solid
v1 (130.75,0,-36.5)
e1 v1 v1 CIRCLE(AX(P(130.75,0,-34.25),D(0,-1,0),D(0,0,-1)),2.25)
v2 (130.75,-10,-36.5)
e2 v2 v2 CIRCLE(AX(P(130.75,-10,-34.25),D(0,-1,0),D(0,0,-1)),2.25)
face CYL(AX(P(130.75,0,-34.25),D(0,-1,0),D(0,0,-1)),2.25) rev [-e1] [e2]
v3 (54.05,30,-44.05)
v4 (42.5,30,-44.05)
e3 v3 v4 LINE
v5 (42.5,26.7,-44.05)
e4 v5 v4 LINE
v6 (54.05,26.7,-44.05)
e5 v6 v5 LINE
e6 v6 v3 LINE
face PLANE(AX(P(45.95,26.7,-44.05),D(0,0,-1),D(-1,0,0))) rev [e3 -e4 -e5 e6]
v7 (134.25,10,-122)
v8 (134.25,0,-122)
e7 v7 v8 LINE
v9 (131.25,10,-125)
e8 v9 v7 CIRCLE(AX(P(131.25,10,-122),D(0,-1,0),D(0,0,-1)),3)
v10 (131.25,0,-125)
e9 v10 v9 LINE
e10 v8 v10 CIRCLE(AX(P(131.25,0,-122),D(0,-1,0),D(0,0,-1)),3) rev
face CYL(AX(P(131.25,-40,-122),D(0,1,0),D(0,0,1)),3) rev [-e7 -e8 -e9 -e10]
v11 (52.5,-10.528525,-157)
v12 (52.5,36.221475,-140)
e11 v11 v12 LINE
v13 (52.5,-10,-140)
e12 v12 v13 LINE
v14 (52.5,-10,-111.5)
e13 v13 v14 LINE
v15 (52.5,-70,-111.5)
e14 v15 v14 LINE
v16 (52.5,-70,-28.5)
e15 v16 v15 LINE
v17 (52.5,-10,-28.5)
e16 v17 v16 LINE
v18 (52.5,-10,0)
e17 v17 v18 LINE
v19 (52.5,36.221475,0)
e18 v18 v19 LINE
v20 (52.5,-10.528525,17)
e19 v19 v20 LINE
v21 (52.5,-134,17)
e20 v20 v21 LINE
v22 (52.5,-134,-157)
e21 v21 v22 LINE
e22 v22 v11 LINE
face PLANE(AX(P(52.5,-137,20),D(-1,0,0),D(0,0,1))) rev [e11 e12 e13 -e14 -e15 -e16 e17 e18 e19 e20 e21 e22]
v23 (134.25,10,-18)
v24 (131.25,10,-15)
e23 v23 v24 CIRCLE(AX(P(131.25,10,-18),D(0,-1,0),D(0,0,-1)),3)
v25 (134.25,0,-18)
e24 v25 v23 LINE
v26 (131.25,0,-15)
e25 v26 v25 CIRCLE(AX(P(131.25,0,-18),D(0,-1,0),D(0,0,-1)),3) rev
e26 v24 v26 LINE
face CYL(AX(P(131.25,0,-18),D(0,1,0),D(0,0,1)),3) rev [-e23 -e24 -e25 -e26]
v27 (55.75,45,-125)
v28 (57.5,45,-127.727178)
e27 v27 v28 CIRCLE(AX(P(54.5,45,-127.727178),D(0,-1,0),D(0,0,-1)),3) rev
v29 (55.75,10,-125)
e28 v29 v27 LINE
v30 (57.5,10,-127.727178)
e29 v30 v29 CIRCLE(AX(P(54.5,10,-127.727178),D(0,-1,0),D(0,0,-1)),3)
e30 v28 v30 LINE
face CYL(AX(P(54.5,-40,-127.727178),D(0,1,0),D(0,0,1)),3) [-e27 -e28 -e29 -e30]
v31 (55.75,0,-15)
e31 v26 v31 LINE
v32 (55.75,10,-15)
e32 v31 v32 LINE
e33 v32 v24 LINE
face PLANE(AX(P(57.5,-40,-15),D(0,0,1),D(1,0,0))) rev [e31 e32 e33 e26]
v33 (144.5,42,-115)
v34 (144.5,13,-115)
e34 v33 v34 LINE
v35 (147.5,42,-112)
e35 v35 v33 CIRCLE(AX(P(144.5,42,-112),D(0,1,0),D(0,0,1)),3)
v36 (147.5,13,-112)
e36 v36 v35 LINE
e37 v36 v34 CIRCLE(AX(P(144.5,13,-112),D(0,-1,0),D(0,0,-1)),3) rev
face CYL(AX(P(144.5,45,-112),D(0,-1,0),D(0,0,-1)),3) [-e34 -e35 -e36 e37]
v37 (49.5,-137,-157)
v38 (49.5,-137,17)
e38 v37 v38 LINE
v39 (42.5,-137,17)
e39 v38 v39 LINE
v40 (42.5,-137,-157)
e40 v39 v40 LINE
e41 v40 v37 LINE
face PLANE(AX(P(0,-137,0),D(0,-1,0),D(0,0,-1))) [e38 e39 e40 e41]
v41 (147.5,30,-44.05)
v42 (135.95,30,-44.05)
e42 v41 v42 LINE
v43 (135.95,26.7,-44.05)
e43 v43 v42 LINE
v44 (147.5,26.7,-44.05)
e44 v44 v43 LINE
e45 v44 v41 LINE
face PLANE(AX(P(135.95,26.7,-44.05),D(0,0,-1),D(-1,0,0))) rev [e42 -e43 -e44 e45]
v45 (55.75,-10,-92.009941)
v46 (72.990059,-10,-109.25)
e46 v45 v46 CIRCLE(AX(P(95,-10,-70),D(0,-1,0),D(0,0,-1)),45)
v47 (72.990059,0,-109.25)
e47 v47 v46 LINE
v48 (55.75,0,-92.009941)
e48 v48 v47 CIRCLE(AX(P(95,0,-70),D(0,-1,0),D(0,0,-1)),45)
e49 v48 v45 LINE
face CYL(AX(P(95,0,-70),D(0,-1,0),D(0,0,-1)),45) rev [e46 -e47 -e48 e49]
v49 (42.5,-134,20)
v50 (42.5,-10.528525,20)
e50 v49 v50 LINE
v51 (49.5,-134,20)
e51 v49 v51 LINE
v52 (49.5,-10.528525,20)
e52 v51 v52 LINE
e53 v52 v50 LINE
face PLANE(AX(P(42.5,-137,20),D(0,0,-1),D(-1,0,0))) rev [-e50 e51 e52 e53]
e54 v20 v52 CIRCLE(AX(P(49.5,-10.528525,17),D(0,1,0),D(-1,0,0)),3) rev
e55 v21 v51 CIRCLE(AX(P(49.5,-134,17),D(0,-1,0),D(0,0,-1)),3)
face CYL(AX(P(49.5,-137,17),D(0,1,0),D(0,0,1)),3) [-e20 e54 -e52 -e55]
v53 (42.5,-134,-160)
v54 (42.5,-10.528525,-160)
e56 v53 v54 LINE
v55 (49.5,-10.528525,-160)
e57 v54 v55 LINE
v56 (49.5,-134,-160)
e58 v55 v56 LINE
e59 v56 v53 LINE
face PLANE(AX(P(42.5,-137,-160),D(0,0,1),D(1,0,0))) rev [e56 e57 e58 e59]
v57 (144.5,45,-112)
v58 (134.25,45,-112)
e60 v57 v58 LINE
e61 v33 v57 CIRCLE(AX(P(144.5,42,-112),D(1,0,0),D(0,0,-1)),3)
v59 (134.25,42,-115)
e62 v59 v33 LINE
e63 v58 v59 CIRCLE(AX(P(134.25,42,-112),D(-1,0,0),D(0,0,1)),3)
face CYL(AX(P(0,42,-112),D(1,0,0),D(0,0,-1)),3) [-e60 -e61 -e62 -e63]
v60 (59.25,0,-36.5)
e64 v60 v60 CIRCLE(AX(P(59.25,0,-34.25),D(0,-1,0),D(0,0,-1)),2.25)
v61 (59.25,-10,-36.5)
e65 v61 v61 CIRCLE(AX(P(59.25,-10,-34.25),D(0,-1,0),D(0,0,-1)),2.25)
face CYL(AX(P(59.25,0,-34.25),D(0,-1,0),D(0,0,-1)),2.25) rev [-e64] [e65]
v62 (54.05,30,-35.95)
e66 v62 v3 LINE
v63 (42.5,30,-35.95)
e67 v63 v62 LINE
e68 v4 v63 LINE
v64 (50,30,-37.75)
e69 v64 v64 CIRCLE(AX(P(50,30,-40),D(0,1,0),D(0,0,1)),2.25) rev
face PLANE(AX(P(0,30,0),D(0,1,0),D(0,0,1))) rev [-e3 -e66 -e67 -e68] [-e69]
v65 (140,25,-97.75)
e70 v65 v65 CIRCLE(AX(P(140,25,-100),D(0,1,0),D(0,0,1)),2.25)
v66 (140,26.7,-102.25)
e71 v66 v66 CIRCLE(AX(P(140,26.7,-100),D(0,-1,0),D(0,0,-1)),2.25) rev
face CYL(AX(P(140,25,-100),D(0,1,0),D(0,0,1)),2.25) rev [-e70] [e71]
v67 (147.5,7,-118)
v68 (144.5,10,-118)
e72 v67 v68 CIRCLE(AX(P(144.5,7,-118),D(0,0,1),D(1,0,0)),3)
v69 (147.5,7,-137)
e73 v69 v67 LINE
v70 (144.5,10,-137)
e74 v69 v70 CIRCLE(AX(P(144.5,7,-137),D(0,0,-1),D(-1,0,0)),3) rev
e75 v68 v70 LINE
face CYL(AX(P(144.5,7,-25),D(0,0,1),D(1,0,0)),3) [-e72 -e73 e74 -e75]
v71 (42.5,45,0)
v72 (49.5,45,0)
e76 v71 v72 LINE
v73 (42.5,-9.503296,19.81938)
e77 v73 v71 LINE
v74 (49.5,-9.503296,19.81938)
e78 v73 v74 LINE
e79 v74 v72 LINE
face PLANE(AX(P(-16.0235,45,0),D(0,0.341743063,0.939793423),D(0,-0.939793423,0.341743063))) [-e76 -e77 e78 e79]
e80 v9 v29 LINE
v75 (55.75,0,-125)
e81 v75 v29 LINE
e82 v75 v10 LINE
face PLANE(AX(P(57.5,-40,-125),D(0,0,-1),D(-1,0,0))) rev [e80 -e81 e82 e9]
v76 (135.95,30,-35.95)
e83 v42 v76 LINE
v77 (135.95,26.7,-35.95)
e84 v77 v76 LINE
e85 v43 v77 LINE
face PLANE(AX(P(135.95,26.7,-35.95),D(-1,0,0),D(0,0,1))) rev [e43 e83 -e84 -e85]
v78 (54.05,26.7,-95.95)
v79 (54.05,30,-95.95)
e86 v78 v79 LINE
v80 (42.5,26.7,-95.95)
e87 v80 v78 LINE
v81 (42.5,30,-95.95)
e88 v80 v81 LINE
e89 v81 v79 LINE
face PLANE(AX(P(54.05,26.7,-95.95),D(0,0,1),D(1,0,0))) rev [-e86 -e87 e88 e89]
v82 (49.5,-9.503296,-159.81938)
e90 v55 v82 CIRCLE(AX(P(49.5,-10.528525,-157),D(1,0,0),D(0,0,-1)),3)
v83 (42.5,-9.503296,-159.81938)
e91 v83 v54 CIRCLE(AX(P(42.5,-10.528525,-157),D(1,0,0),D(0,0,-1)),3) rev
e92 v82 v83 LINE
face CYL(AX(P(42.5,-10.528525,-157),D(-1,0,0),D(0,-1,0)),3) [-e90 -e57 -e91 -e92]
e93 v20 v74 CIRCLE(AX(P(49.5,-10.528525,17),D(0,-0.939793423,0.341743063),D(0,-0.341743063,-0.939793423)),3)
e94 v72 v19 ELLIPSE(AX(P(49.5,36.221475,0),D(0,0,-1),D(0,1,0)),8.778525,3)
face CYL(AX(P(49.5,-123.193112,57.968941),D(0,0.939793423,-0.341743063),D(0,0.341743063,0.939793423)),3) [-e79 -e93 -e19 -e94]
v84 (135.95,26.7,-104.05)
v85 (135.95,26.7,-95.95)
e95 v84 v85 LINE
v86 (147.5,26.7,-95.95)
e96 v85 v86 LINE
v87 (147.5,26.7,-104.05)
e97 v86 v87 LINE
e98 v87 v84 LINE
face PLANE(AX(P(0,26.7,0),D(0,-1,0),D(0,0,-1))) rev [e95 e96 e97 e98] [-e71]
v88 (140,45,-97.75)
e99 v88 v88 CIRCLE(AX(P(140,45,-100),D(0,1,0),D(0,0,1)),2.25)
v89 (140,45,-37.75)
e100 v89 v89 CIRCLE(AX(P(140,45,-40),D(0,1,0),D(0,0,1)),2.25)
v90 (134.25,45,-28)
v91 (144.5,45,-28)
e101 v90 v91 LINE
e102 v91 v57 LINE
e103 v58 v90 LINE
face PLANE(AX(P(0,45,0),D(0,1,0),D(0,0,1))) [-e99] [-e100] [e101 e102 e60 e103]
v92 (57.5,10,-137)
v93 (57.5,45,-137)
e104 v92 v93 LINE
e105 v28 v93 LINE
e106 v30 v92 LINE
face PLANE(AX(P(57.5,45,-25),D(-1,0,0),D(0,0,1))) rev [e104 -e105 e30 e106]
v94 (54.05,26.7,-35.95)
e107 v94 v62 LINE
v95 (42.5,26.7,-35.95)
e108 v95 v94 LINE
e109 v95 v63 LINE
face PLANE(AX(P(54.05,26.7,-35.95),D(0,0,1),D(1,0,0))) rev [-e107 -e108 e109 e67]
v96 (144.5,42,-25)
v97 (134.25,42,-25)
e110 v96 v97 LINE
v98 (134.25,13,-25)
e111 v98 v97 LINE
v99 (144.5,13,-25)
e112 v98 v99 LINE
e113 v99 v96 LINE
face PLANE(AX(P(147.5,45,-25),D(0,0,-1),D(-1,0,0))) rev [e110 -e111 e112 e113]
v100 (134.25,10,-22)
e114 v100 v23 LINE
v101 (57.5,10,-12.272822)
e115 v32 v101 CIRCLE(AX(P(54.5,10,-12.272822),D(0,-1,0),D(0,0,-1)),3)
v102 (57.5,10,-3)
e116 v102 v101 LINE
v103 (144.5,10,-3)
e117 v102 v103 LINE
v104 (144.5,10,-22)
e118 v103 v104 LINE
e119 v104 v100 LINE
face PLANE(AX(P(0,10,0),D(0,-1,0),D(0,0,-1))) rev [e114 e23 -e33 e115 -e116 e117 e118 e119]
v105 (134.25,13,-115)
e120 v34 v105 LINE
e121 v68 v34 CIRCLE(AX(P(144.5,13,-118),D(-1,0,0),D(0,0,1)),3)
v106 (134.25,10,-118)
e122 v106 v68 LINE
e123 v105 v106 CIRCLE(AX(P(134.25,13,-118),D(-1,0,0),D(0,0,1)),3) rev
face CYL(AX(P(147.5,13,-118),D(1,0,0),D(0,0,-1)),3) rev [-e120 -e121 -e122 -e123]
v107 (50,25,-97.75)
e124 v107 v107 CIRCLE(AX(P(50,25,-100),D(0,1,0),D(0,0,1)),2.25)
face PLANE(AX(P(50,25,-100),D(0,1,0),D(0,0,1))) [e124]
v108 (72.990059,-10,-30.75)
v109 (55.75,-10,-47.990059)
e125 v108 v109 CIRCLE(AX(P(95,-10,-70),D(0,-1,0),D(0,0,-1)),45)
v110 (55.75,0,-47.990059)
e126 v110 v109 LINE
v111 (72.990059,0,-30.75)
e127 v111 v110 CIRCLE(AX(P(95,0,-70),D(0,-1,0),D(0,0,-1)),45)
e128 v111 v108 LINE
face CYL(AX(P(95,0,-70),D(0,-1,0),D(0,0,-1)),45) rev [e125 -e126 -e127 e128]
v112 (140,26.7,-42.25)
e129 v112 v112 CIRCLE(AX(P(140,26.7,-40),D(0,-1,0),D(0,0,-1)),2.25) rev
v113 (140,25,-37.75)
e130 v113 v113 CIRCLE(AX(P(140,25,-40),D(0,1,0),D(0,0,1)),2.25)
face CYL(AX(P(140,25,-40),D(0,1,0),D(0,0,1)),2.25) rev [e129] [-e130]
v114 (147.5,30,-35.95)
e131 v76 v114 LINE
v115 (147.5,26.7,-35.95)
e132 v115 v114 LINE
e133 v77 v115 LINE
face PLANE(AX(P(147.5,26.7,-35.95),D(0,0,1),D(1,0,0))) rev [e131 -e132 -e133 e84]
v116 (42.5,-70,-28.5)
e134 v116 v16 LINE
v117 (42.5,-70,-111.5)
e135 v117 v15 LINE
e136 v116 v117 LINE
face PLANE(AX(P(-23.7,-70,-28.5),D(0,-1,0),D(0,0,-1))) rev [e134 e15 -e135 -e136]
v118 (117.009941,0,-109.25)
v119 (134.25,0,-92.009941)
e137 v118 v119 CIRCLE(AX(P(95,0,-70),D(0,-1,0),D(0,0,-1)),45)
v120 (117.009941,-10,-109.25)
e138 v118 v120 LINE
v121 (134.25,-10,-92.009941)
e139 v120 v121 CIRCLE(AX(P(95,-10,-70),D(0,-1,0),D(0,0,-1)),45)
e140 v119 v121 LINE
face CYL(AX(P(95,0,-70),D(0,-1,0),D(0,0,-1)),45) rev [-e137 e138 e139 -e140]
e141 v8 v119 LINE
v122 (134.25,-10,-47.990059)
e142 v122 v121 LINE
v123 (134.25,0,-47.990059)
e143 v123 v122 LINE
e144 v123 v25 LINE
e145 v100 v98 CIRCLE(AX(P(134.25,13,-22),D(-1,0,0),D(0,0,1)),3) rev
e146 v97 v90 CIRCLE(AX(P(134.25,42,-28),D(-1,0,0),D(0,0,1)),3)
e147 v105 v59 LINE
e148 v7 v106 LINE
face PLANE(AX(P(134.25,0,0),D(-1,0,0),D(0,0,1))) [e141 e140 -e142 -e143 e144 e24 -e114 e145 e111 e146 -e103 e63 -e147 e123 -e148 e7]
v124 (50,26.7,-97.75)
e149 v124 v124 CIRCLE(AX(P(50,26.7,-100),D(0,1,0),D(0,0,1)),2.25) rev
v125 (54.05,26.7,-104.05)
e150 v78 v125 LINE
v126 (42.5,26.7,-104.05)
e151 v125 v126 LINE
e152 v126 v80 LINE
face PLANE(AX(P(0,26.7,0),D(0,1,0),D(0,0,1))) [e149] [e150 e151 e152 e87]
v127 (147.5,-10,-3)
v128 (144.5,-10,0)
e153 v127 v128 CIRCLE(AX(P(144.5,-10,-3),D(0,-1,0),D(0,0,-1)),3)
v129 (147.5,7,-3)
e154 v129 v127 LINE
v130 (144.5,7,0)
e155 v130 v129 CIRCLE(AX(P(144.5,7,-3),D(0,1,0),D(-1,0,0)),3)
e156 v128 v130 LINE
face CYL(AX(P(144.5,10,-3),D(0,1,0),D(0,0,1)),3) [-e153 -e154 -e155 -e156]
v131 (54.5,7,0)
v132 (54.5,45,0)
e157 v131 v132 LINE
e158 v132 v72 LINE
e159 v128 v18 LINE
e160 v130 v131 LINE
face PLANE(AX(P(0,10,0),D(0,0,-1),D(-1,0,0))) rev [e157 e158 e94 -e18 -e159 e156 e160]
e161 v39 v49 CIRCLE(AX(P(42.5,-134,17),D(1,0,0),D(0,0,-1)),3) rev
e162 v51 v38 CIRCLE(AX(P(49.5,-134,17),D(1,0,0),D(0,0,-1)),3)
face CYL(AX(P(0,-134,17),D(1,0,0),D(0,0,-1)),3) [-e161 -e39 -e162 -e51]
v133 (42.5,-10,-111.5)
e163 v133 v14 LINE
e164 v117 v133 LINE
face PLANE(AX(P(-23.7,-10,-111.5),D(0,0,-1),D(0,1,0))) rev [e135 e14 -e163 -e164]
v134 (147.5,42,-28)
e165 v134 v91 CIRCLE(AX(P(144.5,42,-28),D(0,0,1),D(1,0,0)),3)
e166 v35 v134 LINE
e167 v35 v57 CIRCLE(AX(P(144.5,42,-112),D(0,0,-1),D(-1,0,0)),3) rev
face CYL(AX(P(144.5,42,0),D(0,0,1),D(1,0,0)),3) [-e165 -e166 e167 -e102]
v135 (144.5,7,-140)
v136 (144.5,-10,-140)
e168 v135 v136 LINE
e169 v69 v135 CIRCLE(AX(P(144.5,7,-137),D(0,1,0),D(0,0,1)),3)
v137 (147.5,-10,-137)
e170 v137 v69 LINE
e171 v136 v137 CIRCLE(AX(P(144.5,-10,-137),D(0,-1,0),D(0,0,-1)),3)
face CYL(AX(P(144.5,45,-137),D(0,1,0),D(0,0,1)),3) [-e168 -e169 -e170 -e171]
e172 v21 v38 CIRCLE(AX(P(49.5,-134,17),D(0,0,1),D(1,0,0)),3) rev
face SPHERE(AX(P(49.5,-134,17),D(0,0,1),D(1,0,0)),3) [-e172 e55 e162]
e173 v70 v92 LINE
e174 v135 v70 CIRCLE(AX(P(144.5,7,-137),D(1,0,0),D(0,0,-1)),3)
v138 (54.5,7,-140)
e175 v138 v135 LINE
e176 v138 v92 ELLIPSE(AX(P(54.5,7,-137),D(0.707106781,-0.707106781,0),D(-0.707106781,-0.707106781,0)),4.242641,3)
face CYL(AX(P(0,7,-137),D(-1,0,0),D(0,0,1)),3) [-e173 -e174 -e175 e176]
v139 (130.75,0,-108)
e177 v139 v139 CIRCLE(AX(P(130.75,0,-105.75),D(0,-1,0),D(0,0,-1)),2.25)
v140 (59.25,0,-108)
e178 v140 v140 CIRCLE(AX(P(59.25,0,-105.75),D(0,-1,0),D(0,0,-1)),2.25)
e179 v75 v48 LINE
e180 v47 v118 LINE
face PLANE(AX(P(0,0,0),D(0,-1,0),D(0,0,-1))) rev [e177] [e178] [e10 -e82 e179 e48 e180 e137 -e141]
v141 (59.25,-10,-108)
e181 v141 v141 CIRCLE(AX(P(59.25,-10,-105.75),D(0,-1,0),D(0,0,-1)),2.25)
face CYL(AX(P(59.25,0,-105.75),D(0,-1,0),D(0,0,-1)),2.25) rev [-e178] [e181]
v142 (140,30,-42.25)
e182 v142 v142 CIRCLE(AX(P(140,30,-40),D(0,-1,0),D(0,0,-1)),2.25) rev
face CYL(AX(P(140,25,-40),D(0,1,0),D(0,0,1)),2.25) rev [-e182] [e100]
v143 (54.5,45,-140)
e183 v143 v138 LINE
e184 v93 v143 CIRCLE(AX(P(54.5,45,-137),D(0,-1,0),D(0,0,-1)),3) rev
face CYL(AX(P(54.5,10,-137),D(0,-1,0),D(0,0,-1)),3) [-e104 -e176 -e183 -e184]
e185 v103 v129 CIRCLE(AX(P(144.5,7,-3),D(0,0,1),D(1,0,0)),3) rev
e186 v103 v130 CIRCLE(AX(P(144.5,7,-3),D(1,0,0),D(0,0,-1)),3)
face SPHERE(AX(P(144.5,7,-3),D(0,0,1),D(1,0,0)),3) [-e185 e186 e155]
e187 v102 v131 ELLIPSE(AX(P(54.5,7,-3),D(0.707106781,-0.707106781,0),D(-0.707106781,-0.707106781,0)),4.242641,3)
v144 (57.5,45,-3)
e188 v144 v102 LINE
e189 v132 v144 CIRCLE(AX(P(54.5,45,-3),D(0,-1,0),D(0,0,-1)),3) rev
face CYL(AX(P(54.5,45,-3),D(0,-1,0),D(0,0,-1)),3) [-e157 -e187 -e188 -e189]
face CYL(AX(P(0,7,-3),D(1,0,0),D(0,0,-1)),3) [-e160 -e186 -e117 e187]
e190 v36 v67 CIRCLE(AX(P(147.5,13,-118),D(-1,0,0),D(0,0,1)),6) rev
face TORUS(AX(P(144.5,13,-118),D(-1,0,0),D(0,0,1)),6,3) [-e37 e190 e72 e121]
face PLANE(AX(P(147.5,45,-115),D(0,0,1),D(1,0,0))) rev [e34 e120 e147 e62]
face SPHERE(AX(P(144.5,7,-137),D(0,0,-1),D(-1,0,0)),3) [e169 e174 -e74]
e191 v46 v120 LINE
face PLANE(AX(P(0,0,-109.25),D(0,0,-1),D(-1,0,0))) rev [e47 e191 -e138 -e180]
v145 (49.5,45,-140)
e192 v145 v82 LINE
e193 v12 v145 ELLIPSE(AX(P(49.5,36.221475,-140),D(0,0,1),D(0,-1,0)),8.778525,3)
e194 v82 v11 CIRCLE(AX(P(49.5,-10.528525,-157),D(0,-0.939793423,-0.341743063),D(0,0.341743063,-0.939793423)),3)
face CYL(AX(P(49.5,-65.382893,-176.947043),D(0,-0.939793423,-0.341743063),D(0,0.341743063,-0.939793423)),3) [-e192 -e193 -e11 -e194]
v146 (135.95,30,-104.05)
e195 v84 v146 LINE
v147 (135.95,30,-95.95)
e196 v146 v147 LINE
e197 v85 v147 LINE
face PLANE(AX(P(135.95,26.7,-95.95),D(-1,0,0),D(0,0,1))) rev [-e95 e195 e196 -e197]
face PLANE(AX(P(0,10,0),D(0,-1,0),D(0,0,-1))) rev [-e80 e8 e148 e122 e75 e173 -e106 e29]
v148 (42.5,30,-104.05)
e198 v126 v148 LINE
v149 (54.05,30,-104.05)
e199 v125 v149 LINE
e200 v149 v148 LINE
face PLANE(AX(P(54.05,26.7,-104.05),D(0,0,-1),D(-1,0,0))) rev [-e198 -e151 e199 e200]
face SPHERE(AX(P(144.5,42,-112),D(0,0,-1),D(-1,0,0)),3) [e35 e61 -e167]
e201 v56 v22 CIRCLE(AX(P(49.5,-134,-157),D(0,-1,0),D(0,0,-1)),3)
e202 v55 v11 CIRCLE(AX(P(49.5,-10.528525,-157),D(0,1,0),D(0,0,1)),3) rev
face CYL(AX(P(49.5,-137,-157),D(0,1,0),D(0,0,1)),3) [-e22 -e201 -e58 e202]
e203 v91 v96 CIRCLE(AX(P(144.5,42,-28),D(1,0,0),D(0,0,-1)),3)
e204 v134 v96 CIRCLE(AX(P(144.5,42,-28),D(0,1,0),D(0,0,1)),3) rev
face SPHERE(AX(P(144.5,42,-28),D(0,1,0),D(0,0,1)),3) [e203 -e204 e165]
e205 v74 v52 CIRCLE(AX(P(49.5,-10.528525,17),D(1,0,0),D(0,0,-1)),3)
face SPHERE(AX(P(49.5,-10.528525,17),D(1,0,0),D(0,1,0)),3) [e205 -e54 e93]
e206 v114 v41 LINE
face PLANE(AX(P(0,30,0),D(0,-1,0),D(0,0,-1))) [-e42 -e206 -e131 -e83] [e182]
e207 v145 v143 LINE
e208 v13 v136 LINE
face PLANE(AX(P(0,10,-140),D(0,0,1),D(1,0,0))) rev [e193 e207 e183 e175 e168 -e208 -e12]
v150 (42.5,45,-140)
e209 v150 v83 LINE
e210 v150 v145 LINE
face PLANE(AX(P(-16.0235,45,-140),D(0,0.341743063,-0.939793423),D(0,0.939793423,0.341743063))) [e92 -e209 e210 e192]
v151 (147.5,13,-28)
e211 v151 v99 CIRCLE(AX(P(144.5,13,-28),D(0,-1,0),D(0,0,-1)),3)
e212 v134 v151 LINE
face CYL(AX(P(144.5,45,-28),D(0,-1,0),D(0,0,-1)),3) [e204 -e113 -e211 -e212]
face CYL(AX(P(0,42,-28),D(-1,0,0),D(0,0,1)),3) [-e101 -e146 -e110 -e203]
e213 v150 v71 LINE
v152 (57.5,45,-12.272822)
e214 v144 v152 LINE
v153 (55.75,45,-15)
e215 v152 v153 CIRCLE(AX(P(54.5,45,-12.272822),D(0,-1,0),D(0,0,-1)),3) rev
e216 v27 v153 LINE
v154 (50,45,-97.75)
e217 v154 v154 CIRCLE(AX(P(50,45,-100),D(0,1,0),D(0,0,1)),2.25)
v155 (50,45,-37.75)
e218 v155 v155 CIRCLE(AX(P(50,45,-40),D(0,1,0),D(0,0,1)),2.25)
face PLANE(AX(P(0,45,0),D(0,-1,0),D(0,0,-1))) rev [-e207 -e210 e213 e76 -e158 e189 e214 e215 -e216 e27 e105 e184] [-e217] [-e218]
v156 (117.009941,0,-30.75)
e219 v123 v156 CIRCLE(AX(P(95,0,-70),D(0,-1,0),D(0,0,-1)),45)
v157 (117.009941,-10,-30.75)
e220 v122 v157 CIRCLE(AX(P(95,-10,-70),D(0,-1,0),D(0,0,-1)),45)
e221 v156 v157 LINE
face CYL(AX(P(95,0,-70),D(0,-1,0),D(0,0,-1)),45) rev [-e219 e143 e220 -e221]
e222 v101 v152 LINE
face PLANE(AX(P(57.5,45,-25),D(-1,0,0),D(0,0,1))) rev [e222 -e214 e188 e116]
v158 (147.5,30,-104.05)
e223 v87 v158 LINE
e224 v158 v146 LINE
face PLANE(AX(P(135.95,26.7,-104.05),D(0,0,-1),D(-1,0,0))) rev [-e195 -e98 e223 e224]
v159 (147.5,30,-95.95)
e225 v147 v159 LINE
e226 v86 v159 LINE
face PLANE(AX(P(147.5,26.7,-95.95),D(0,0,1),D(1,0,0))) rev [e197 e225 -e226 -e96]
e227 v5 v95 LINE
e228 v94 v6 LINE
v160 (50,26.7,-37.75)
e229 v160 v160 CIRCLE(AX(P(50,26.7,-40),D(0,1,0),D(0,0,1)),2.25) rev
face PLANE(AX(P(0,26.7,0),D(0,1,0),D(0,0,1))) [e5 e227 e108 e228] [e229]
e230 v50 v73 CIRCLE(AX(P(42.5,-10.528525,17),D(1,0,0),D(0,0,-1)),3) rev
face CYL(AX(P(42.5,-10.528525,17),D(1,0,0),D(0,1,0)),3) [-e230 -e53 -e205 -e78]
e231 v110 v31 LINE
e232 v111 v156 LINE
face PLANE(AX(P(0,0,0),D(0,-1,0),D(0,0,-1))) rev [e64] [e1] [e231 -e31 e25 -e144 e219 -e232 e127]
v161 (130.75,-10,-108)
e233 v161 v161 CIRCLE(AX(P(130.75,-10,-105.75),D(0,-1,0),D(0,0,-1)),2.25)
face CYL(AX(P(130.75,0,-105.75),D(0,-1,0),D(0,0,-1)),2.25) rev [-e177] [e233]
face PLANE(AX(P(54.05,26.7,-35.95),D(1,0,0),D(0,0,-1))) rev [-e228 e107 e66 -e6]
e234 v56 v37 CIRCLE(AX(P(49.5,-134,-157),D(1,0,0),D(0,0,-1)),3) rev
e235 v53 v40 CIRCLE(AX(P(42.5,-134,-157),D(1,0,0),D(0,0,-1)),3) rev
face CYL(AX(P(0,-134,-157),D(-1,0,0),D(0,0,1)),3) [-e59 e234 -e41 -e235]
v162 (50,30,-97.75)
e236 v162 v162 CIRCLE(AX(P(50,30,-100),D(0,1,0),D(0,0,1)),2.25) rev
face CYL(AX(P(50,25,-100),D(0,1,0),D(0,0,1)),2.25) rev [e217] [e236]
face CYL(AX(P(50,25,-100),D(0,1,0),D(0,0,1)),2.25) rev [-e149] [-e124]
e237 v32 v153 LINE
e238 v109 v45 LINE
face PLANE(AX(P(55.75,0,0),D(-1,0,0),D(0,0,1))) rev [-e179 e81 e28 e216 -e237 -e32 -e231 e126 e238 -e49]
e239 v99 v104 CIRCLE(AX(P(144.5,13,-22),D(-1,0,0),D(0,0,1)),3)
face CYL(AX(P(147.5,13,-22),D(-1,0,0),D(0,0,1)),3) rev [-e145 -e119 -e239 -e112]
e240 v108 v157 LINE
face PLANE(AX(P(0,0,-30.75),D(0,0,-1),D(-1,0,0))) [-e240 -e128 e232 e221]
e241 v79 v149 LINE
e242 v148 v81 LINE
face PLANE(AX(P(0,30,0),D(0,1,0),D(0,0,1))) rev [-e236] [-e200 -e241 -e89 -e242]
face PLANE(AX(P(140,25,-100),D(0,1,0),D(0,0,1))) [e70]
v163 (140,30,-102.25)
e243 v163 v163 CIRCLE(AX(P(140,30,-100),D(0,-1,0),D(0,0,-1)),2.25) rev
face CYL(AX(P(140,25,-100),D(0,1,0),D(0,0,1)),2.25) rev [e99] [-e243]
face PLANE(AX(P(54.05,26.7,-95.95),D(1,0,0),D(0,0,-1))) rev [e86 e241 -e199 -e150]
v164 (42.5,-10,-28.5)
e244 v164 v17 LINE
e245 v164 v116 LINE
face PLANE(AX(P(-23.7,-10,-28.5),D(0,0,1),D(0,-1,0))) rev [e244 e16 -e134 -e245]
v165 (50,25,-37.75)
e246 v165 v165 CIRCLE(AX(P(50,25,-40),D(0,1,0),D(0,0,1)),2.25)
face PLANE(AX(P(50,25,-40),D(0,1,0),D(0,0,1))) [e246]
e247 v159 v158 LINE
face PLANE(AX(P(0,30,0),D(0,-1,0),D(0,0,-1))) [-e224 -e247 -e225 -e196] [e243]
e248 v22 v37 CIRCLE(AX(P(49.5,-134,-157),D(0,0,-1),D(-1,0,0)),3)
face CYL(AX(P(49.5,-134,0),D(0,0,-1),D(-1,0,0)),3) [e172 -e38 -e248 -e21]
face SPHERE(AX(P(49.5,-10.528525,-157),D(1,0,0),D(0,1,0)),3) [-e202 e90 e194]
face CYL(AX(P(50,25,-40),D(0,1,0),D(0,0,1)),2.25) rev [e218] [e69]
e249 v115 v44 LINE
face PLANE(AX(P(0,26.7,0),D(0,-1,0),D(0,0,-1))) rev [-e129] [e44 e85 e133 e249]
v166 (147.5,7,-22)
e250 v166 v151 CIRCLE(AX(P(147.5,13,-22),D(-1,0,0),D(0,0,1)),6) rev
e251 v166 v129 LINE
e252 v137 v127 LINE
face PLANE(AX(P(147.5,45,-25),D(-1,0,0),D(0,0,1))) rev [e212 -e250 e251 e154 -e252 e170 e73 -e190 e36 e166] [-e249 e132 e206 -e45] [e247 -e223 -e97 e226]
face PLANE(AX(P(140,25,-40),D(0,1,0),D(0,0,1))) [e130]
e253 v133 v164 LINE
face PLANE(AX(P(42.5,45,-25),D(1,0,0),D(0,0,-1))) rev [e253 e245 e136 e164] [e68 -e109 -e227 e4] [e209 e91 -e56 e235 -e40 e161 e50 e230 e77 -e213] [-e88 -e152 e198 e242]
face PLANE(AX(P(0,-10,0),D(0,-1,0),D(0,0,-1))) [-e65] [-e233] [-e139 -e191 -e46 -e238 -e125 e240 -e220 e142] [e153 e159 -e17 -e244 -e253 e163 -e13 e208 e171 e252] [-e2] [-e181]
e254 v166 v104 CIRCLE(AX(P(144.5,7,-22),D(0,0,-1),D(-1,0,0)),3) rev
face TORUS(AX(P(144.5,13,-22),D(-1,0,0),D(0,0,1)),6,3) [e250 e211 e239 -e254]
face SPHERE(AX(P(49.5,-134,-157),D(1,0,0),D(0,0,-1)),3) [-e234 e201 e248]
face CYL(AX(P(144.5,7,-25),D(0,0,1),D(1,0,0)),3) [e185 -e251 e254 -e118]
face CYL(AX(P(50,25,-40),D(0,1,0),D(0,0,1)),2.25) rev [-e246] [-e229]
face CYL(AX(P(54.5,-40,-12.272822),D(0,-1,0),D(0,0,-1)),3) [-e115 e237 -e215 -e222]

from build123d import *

# Parameters (mm, degrees)
SKETCH1_W           = 190
SKETCH1_H           = 140
BOSS_EXTRUDE1_DEPTH = 10
SKETCH3_W           = 15
SKETCH3_H           = 90
BOSS_EXTRUDE3_DEPTH = 35
SKETCH4_R           = 2.25
CUT_EXTRUDE1_DEPTH  = 20
SKETCH5_W           = 75
SKETCH5_H           = 110
CUT_EXTRUDE2_DEPTH  = 50
SKETCH8_R           = 2.5
CUT_EXTRUDE4_DEPTH  = 10
CUT_EXTRUDE5_DEPTH  = 3.3
SKETCH11_W          = 42.5
SKETCH11_H          = 140
CUT_EXTRUDE6_DEPTH  = 10
SKETCH12_W          = 15
SKETCH12_H          = 25
BOSS_EXTRUDE4_DEPTH = 35
SKETCH14_W          = 105
SKETCH14_H          = 140
BOSS_EXTRUDE5_DEPTH = 10
SKETCH15_R          = 2.25
CUT_EXTRUDE7_DEPTH  = 10
CUT_EXTRUDE8_DEPTH  = 45
SKETCH20_W          = 10
SKETCH20_H          = 180
BOSS_EXTRUDE6_DEPTH = 127
SKETCH21_W          = 83
SKETCH21_H          = 60
CUT_EXTRUDE10_DEPTH = 76.2
BOSS_EXTRUDE7_DEPTH = 10
SKETCH17_W          = 1.75
SKETCH17_H          = 10
CUT_EXTRUDE9_DEPTH  = 10
FILLET1_R           = 3


with BuildPart() as part:
    # Sketch1 → Boss-Extrude1 (new body)
    with BuildSketch(Plane(origin=(0, 0, 0), x_dir=(1, 0, 0), z_dir=(0, 1, 0))):
        with Locations((95, 70)):
            Rectangle(SKETCH1_W, SKETCH1_H)
    extrude(amount=BOSS_EXTRUDE1_DEPTH)

    # Sketch3 → Boss-Extrude3 (add)
    with BuildSketch(Plane(origin=(0, 10, 0), x_dir=(1, 0, 0), z_dir=(0, 1, 0))):
        with Locations((50, 70)):
            Rectangle(SKETCH3_W, SKETCH3_H)
        with Locations((140, 70)):
            Rectangle(SKETCH3_W, SKETCH3_H)
    extrude(amount=BOSS_EXTRUDE3_DEPTH)

    # Sketch4 → Cut-Extrude1 (cut)
    with BuildSketch(Plane(origin=(0, 45, 0), x_dir=(1, 0, 0), z_dir=(0, 1, 0))):
        with Locations(Location((50, 100, 0), (0, 0, 270))):
            Circle(SKETCH4_R)
        with Locations(Location((140, 100, 0), (0, 0, 270))):
            Circle(SKETCH4_R)
        with Locations(Location((140, 40, 0), (0, 0, 270))):
            Circle(SKETCH4_R)
        with Locations(Location((50, 40, 0), (0, 0, 270))):
            Circle(SKETCH4_R)
    extrude(amount=-CUT_EXTRUDE1_DEPTH, mode=Mode.SUBTRACT)

    # Sketch5 → Cut-Extrude2 (cut)
    with BuildSketch(Plane(origin=(0, 10, 0), x_dir=(1, 0, 0), z_dir=(0, 1, 0))):
        with Locations((95, 70)):
            Rectangle(SKETCH5_W, SKETCH5_H)
    extrude(amount=-CUT_EXTRUDE2_DEPTH, mode=Mode.SUBTRACT)

    # Sketch8 → Cut-Extrude4 (cut)
    with BuildSketch(Plane(origin=(0, 10, 0), x_dir=(1, 0, 0), z_dir=(0, 1, 0))):
        with Locations(Location((10, 130, 0), (0, 0, 270))):
            Circle(SKETCH8_R)
        with Locations(Location((180, 130, 0), (0, 0, 270))):
            Circle(SKETCH8_R)
        with Locations(Location((180, 10, 0), (0, 0, 270))):
            Circle(SKETCH8_R)
        with Locations(Location((10, 10, 0), (0, 0, 270))):
            Circle(SKETCH8_R)
    extrude(amount=-CUT_EXTRUDE4_DEPTH, mode=Mode.SUBTRACT)

    # Sketch10 → Cut-Extrude5 (cut)
    with BuildSketch(Plane(origin=(0, 30, 0), x_dir=(1, 0, 0), z_dir=(0, 1, 0))):
        Polygon((45.95, 44.05), (42.5, 44.05), (42.5, 35.95), (45.95, 35.95), (54.05, 35.95), (54.05, 44.05), align=None)
        Polygon((42.5, 95.95), (45.95, 95.95), (54.05, 95.95), (54.05, 104.05), (45.95, 104.05), (42.5, 104.05), align=None)
        Polygon((147.5, 35.95), (144.05, 35.95), (135.95, 35.95), (135.95, 44.05), (144.05, 44.05), (147.5, 44.05), align=None)
        Polygon((147.5, 104.05), (147.5, 95.95), (144.05, 95.95), (135.95, 95.95), (135.95, 104.05), (144.05, 104.05), align=None)
    extrude(amount=-CUT_EXTRUDE5_DEPTH, mode=Mode.SUBTRACT)

    # Sketch11 → Cut-Extrude6 (cut)
    with BuildSketch(Plane(origin=(0, 10, 0), x_dir=(1, 0, 0), z_dir=(0, 1, 0))):
        with Locations((168.75, 70)):
            Rectangle(SKETCH11_W, SKETCH11_H)
        with Locations((21.25, 70)):
            Rectangle(SKETCH11_W, SKETCH11_H)
    extrude(amount=-CUT_EXTRUDE6_DEPTH, mode=Mode.SUBTRACT)

    # Sketch12 → Boss-Extrude4 (add)
    with BuildSketch(Plane(origin=(0, 10, 0), x_dir=(1, 0, 0), z_dir=(0, 1, 0))):
        with Locations((50, 127.5)):
            Rectangle(SKETCH12_W, SKETCH12_H)
        with Locations((50, 12.5)):
            Rectangle(SKETCH12_W, SKETCH12_H)
    extrude(amount=BOSS_EXTRUDE4_DEPTH)

    # Sketch14 → Boss-Extrude5 (add)
    with BuildSketch(Plane.XZ):
        with Locations((95, -70)):
            Rectangle(SKETCH14_W, SKETCH14_H)
    extrude(amount=BOSS_EXTRUDE5_DEPTH)

    # Sketch15 → Cut-Extrude7 (cut)
    with BuildSketch(Plane.XZ.offset(10)):
        with BuildLine():
            Line((117.009940936, -30.75), (72.990059064, -30.75))
            ThreePointArc((72.990059064, -30.75), (63.180194847, -38.180194847), (55.75, -47.990059064))
            Line((55.75, -47.990059064), (55.75, -92.009940936))
            ThreePointArc((55.75, -92.009940936), (63.180194847, -101.819805153), (72.990059064, -109.25))
            Line((72.990059064, -109.25), (117.009940936, -109.25))
            ThreePointArc((117.009940936, -109.25), (126.819805153, -101.819805153), (134.25, -92.009940936))
            Line((134.25, -92.009940936), (134.25, -47.990059064))
            ThreePointArc((134.25, -47.990059064), (126.819805153, -38.180194847), (117.009940936, -30.75))
        make_face()
        with Locations(Location((130.75, -34.25, 0), (0, 0, 270))):
            Circle(SKETCH15_R)
        with Locations(Location((59.25, -34.25, 0), (0, 0, 270))):
            Circle(SKETCH15_R)
        with Locations(Location((59.25, -105.75, 0), (0, 0, 270))):
            Circle(SKETCH15_R)
        with Locations(Location((130.75, -105.75, 0), (0, 0, 270))):
            Circle(SKETCH15_R)
    extrude(amount=-CUT_EXTRUDE7_DEPTH, mode=Mode.SUBTRACT)

    # Sketch16 → Cut-Extrude8 (cut)
    with BuildSketch(Plane(origin=(0, 45, 0), x_dir=(1, 0, 0), z_dir=(0, 1, 0))):
        Polygon((55.75, 92.009940936), (55.75, 47.990059064), (55.75, 15), (57.5, 15), (57.5, 125), (55.75, 125), align=None)
        Polygon((134.25, 25), (134.25, 47.990059064), (134.25, 92.009940936), (134.25, 115), (132.5, 115), (132.5, 25), align=None)
    extrude(amount=-CUT_EXTRUDE8_DEPTH, mode=Mode.SUBTRACT)

    # Sketch20 → Boss-Extrude6 (add)
    with BuildSketch(Plane.XZ.offset(10)):
        with Locations((47.5, -70)):
            Rectangle(SKETCH20_W, SKETCH20_H)
    extrude(amount=BOSS_EXTRUDE6_DEPTH)

    # Sketch21 → Cut-Extrude10 (cut)
    with BuildSketch(Plane(origin=(52.5, 0, 0), x_dir=(0, 0, -1), z_dir=(1, 0, 0))):
        with Locations((70, -40)):
            Rectangle(SKETCH21_W, SKETCH21_H)
    extrude(amount=-CUT_EXTRUDE10_DEPTH, mode=Mode.SUBTRACT)

    # Sketch22 → Boss-Extrude7 (add)
    with BuildSketch(Plane(origin=(52.5, 0, 0), x_dir=(0, 0, -1), z_dir=(1, 0, 0))):
        Polygon((0, 45), (-20, -10), (0, -10), align=None)
        Polygon((140, 45), (160, -10), (140, -10), align=None)
    extrude(amount=-BOSS_EXTRUDE7_DEPTH)

    # Sketch17 → Cut-Extrude9 (cut)
    with BuildSketch(Plane(origin=(0, 10, 0), x_dir=(1, 0, 0), z_dir=(0, 1, 0))):
        with Locations((133.375, 20)):
            Rectangle(SKETCH17_W, SKETCH17_H)
        with Locations((133.375, 120)):
            Rectangle(SKETCH17_W, SKETCH17_H)
    extrude(amount=-CUT_EXTRUDE9_DEPTH, mode=Mode.SUBTRACT)

    # Fillet1
    # the kernel refuses this fillet: 3 mm, written as the material it adds along each edge
    with BuildSketch(Plane(origin=(147.5, 10, -115), x_dir=(0, 0, -1), z_dir=(-1, 0, 0))) as fillet1_piece_1:
        with BuildLine():
            CenterArc((FILLET1_R, -FILLET1_R), FILLET1_R, 90, 90)
            Line((0, -FILLET1_R), (0, 0))
            Line((0, 0), (FILLET1_R, 0))
        make_face()
    extrude(amount=13.25)
    with BuildSketch(Plane(origin=(134.25, 10, -25), x_dir=(0, 1, 0), z_dir=(1, 0, 0))) as fillet1_piece_2:
        with BuildLine():
            CenterArc((FILLET1_R, FILLET1_R), FILLET1_R, 180, 90)
            Line((0, FILLET1_R), (0, 0))
            Line((0, 0), (FILLET1_R, 0))
        make_face()
    extrude(amount=13.25)
    with BuildSketch(Plane(origin=(134.25, 10, -15), x_dir=(0, 0, -1), z_dir=(0, -1, 0))) as fillet1_piece_3:
        with BuildLine():
            CenterArc((FILLET1_R, -FILLET1_R), FILLET1_R, 90, 90)
            Line((0, -FILLET1_R), (0, 0))
            Line((0, 0), (FILLET1_R, 0))
        make_face()
    extrude(amount=17.5)
    with BuildSketch(Plane(origin=(134.25, 10, -125), x_dir=(0, 0, 1), z_dir=(0, -1, 0))) as fillet1_piece_4:
        with BuildLine():
            CenterArc((FILLET1_R, FILLET1_R), FILLET1_R, 180, 90)
            Line((0, FILLET1_R), (0, 0))
            Line((0, 0), (FILLET1_R, 0))
        make_face()
    extrude(amount=17.5)
    # the kernel refuses this fillet: 3 mm, written as the material it takes off along each edge
    with BuildSketch(Plane(origin=(49.5, -10.528524933, -157), x_dir=(0, 0, -1), z_dir=(1, 0, 0))) as fillet1_2_piece_1_section:
        Polygon((0, 0), (FILLET1_R * 1.02, 0), (FILLET1_R * 1.02, FILLET1_R * 0.179698477234), (FILLET1_R * 0.958589291958, FILLET1_R * 0.348577924348), align=None)
    fillet1_2_piece_1 = extrude(amount=FILLET1_R * 1.02, mode=Mode.PRIVATE)
    fillet1_2_piece_1 = fillet1_2_piece_1 - Plane(origin=(49.5, -10.528524933, -157), x_dir=(0, -0.17350299206578987, 0.9848333421164306), z_dir=(1, 0, 0)) * Sphere(FILLET1_R, mode=Mode.PRIVATE)
    add(fillet1_2_piece_1, mode=Mode.SUBTRACT)
    with BuildSketch(Plane(origin=(49.5, -134, -157), x_dir=(0, 0, -1), z_dir=(1, 0, 0))) as fillet1_2_piece_2_section:
        Polygon((0, 0), (FILLET1_R * 1.02, 0), (FILLET1_R * 1.02, -FILLET1_R * 1.02), (0, -FILLET1_R * 1.02), align=None)
    fillet1_2_piece_2 = extrude(amount=FILLET1_R * 1.02, mode=Mode.PRIVATE)
    fillet1_2_piece_2 = fillet1_2_piece_2 - Plane(origin=(49.5, -134, -157), x_dir=(0, 0.7071067811865475, 0.7071067811865475), z_dir=(1, 0, 0)) * Sphere(FILLET1_R, mode=Mode.PRIVATE)
    add(fillet1_2_piece_2, mode=Mode.SUBTRACT)
    with BuildSketch(Plane(origin=(49.5, -10.528524933, 17), x_dir=(0, 0.34174306308670455, 0.9397934234884371), z_dir=(1, 0, 0))) as fillet1_2_piece_3_section:
        Polygon((0, 0), (FILLET1_R * 1.02, 0), (FILLET1_R * 1.02, FILLET1_R * 0.179698477234), (FILLET1_R * 0.958589291958, FILLET1_R * 0.348577924348), align=None)
    fillet1_2_piece_3 = extrude(amount=FILLET1_R * 1.02, mode=Mode.PRIVATE)
    fillet1_2_piece_3 = fillet1_2_piece_3 - Plane(origin=(49.5, -10.528524933, 17), x_dir=(0, -0.17350299206578976, -0.9848333421164306), z_dir=(1, 0, 0)) * Sphere(FILLET1_R, mode=Mode.PRIVATE)
    add(fillet1_2_piece_3, mode=Mode.SUBTRACT)
    with BuildSketch(Plane(origin=(49.5, -134, 17), x_dir=(1, 0, 0), z_dir=(0, 0, 1))) as fillet1_2_piece_4_section:
        Polygon((0, 0), (FILLET1_R * 1.02, 0), (FILLET1_R * 1.02, -FILLET1_R * 1.02), (0, -FILLET1_R * 1.02), align=None)
    fillet1_2_piece_4 = extrude(amount=FILLET1_R * 1.02, mode=Mode.PRIVATE)
    fillet1_2_piece_4 = fillet1_2_piece_4 - Plane(origin=(49.5, -134, 17), x_dir=(-0.7071067811865475, 0.7071067811865475, 0), z_dir=(0, 0, 1)) * Sphere(FILLET1_R, mode=Mode.PRIVATE)
    add(fillet1_2_piece_4, mode=Mode.SUBTRACT)
    with BuildSketch(Plane(origin=(155, 10, -140), x_dir=(0, -1, 0), z_dir=(-1, 0, 0)), Plane(origin=(57.5, 10, 0), x_dir=(0, -1, 0), z_dir=(1, 0, 0))) as fillet1_2_piece_5:
        with BuildLine():
            CenterArc((FILLET1_R, FILLET1_R), FILLET1_R, 180, 90)
            Line((0, FILLET1_R), (0, 0))
            Line((0, 0), (FILLET1_R, 0))
        make_face()
    extrude(amount=97.5, mode=Mode.SUBTRACT)
    with BuildSketch(Plane(origin=(147.5, -17.5, 0), x_dir=(-1, 0, 0), z_dir=(0, 1, 0)), Plane(origin=(147.5, -17.5, -140), x_dir=(0, 0, 1), z_dir=(0, 1, 0))) as fillet1_2_piece_6:
        with BuildLine():
            CenterArc((FILLET1_R, -FILLET1_R), FILLET1_R, 90, 90)
            Line((0, -FILLET1_R), (0, 0))
            Line((0, 0), (FILLET1_R, 0))
        make_face()
    extrude(amount=35, mode=Mode.SUBTRACT)
    with BuildSketch(Plane(origin=(57.5, 10, -140), x_dir=(-1, 0, 0), z_dir=(0, 1, 0))) as fillet1_2_piece_7:
        with BuildLine():
            CenterArc((FILLET1_R, FILLET1_R), FILLET1_R, 180, 90)
            Line((0, FILLET1_R), (0, 0))
            Line((0, 0), (FILLET1_R, 0))
        make_face()
    extrude(amount=42.5, mode=Mode.SUBTRACT)
    with BuildSketch(Plane(origin=(57.5, 10, 0), x_dir=(-1, 0, 0), z_dir=(0, 1, 0))) as fillet1_2_piece_8:
        with BuildLine():
            CenterArc((FILLET1_R, -FILLET1_R), FILLET1_R, 90, 90)
            Line((0, -FILLET1_R), (0, 0))
            Line((0, 0), (FILLET1_R, 0))
        make_face()
    extrude(amount=42.5, mode=Mode.SUBTRACT)
    with BuildSketch(Plane(origin=(147.5, 45, -17.5), x_dir=(0, -1, 0), z_dir=(0, 0, -1))) as fillet1_2_piece_9:
        with BuildLine():
            CenterArc((FILLET1_R, FILLET1_R), FILLET1_R, 180, 90)
            Line((0, FILLET1_R), (0, 0))
            Line((0, 0), (FILLET1_R, 0))
        make_face()
    extrude(amount=105, mode=Mode.SUBTRACT)
    with BuildSketch(Plane(origin=(155, 45, -115), x_dir=(0, -1, 0), z_dir=(-1, 0, 0))) as fillet1_2_piece_10:
        with BuildLine():
            CenterArc((FILLET1_R, FILLET1_R), FILLET1_R, 180, 90)
            Line((0, FILLET1_R), (0, 0))
            Line((0, 0), (FILLET1_R, 0))
        make_face()
    extrude(amount=28.25, mode=Mode.SUBTRACT)
    with BuildSketch(Plane(origin=(126.75, 45, -25), x_dir=(0, 0, -1), z_dir=(1, 0, 0))) as fillet1_2_piece_11:
        with BuildLine():
            CenterArc((FILLET1_R, -FILLET1_R), FILLET1_R, 90, 90)
            Line((0, -FILLET1_R), (0, 0))
            Line((0, 0), (FILLET1_R, 0))
        make_face()
    extrude(amount=28.25, mode=Mode.SUBTRACT)
    with BuildSketch(Plane(origin=(49.5, -10, -160), x_dir=(0, -1, 0), z_dir=(-1, 0, 0))) as fillet1_2_piece_12:
        with BuildLine():
            CenterArc((FILLET1_R * 0.17617497768, FILLET1_R), FILLET1_R, 250.016893478, 19.983106522)
            Line((-FILLET1_R * 0.165568085407, FILLET1_R * 0.0602065765116), (0, 0))
            Line((0, 0), (FILLET1_R * 0.17617497768, 0))
        make_face()
    extrude(amount=8.321312333, mode=Mode.SUBTRACT)
    with BuildSketch(Plane(origin=(52.5, -10.528524933, -160), x_dir=(0, 0, 1), z_dir=(0, -1, 0))) as fillet1_2_piece_13:
        with BuildLine():
            CenterArc((FILLET1_R, FILLET1_R), FILLET1_R, 180, 90)
            Line((0, FILLET1_R), (0, 0))
            Line((0, 0), (FILLET1_R, 0))
        make_face()
    extrude(amount=123.471475067, mode=Mode.SUBTRACT)
    with BuildSketch(Plane(origin=(41.178687667, -10, 20), x_dir=(0, 0.9397934234884373, -0.3417430630867039), z_dir=(1, 0, 0))) as fillet1_2_piece_14:
        with BuildLine():
            CenterArc((FILLET1_R * 0.17617497768, -FILLET1_R), FILLET1_R, 90, 19.983106522)
            Line((-FILLET1_R * 0.165568085407, -FILLET1_R * 0.0602065765116), (0, 0))
            Line((0, 0), (FILLET1_R * 0.17617497768, 0))
        make_face()
    extrude(amount=8.321312333, mode=Mode.SUBTRACT)
    with BuildSketch(Plane(origin=(52.5, -10.528524933, 20), x_dir=(0, 0, -1), z_dir=(0, -1, 0))) as fillet1_2_piece_15:
        with BuildLine():
            CenterArc((FILLET1_R, -FILLET1_R), FILLET1_R, 90, 90)
            Line((0, -FILLET1_R), (0, 0))
            Line((0, 0), (FILLET1_R, 0))
        make_face()
    extrude(amount=123.471475067, mode=Mode.SUBTRACT)
    with BuildSketch(Plane(origin=(49.5, -137, -160), x_dir=(0, 0, 1), z_dir=(-1, 0, 0))) as fillet1_2_piece_16:
        with BuildLine():
            CenterArc((FILLET1_R, FILLET1_R), FILLET1_R, 180, 90)
            Line((0, FILLET1_R), (0, 0))
            Line((0, 0), (FILLET1_R, 0))
        make_face()
    extrude(amount=14.5, mode=Mode.SUBTRACT)
    with BuildSketch(Plane(origin=(52.5, -137, 17), x_dir=(0, 1, 0), z_dir=(0, 0, -1))) as fillet1_2_piece_17:
        with BuildLine():
            CenterArc((FILLET1_R, -FILLET1_R), FILLET1_R, 90, 90)
            Line((0, -FILLET1_R), (0, 0))
            Line((0, 0), (FILLET1_R, 0))
        make_face()
    extrude(amount=174, mode=Mode.SUBTRACT)
    with BuildSketch(Plane(origin=(35, -137, 20), x_dir=(0, 1, 0), z_dir=(1, 0, 0))) as fillet1_2_piece_18:
        with BuildLine():
            CenterArc((FILLET1_R, -FILLET1_R), FILLET1_R, 90, 90)
            Line((0, -FILLET1_R), (0, 0))
            Line((0, 0), (FILLET1_R, 0))
        make_face()
    extrude(amount=14.5, mode=Mode.SUBTRACT)
    with BuildSketch(Plane(origin=(52.5, 52.048450676, -2.563072973), x_dir=(0, -0.3417430630867045, -0.9397934234884371), z_dir=(0, -0.9397934234884371, 0.34174306308670455))) as fillet1_2_piece_19_section:
        with BuildLine():
            CenterArc((FILLET1_R, -FILLET1_R), FILLET1_R, 90, 90)
            Line((0, -FILLET1_R), (0, 0))
            Line((0, 0), (FILLET1_R, 0))
        make_face()
    fillet1_2_piece_19 = extrude(amount=65.494974621, mode=Mode.PRIVATE)
    fillet1_2_piece_19 = split(fillet1_2_piece_19, bisect_by=Plane(origin=(52.5, 52.048450676, 0), z_dir=(0, 0, 1)), keep=Keep.TOP, mode=Mode.PRIVATE)
    add(fillet1_2_piece_19, mode=Mode.SUBTRACT)
    with BuildSketch(Plane(origin=(52.5, 52.048450676, -137.436927027), x_dir=(0, -0.34174306308670477, 0.9397934234884369), z_dir=(0, -0.9397934234884369, -0.34174306308670477))) as fillet1_2_piece_20_section:
        with BuildLine():
            CenterArc((FILLET1_R, FILLET1_R), FILLET1_R, 180, 90)
            Line((0, FILLET1_R), (0, 0))
            Line((0, 0), (FILLET1_R, 0))
        make_face()
    fillet1_2_piece_20 = extrude(amount=65.494974621, mode=Mode.PRIVATE)
    fillet1_2_piece_20 = split(fillet1_2_piece_20, bisect_by=Plane(origin=(52.5, 52.048450676, -140), z_dir=(0, 0, -1)), keep=Keep.TOP, mode=Mode.PRIVATE)
    add(fillet1_2_piece_20, mode=Mode.SUBTRACT)
    with BuildSketch(Plane(origin=(57.5, 51.817945072, -15), x_dir=(0, 0, 1), z_dir=(0, -1, 0))) as fillet1_2_piece_21:
        with BuildLine():
            CenterArc((2.727178029, 3), FILLET1_R, 204.624318352, 65.375681648)
            Line((0, 1.75), (0, 0))
            Line((0, 0), (2.727178029, 0))
        make_face()
    extrude(amount=41.817945072, mode=Mode.SUBTRACT)
    with BuildSketch(Plane(origin=(57.5, 51.817945072, -125), x_dir=(-1, 0, 0), z_dir=(0, -1, 0))) as fillet1_2_piece_22:
        with BuildLine():
            CenterArc((3, 2.727178029), FILLET1_R, 180, 65.375681648)
            Line((0, 2.727178029), (0, 0))
            Line((0, 0), (1.75, 0))
        make_face()
    extrude(amount=41.817945072, mode=Mode.SUBTRACT)
    with BuildSketch(Plane(origin=(57.5, 2.5, -140), x_dir=(-1, 0, 0), z_dir=(0, 1, 0))) as fillet1_2_piece_23a_section:
        with BuildLine():
            CenterArc((FILLET1_R, FILLET1_R), FILLET1_R, 180, 90)
            Line((0, FILLET1_R), (0, 0))
            Line((0, 0), (FILLET1_R, 0))
        make_face()
    fillet1_2_piece_23a = extrude(amount=42.5, mode=Mode.PRIVATE)
    fillet1_2_piece_23a = split(fillet1_2_piece_23a, bisect_by=Plane(origin=(57.5, 10, -140), z_dir=(0, -1, 0)), keep=Keep.TOP, mode=Mode.PRIVATE)
    with BuildSketch(Plane(origin=(147.5, 10, -140), x_dir=(0, -1, 0), z_dir=(-1, 0, 0))) as fillet1_2_piece_23b_section:
        with BuildLine():
            CenterArc((FILLET1_R, FILLET1_R), FILLET1_R, 180, 90)
            Line((0, FILLET1_R), (0, 0))
            Line((0, 0), (FILLET1_R, 0))
        make_face()
    fillet1_2_piece_23b = extrude(amount=97.5, mode=Mode.PRIVATE)
    fillet1_2_piece_23b = split(fillet1_2_piece_23b, bisect_by=Plane(origin=(52.5, 10, -140), z_dir=(1, 0, 0)), keep=Keep.TOP, mode=Mode.PRIVATE)
    fillet1_2_piece_23b = split(fillet1_2_piece_23b, bisect_by=Plane(origin=(57.5, 10, -140), z_dir=(-1, 0, 0)), keep=Keep.TOP, mode=Mode.PRIVATE)
    fillet1_2_piece_23 = fillet1_2_piece_23a & fillet1_2_piece_23b
    add(fillet1_2_piece_23, mode=Mode.SUBTRACT)
    with BuildSketch(Plane(origin=(50, 10, 0), x_dir=(0, -1, 0), z_dir=(1, 0, 0))) as fillet1_2_piece_24a_section:
        with BuildLine():
            CenterArc((FILLET1_R, FILLET1_R), FILLET1_R, 180, 90)
            Line((0, FILLET1_R), (0, 0))
            Line((0, 0), (FILLET1_R, 0))
        make_face()
    fillet1_2_piece_24a = extrude(amount=97.5, mode=Mode.PRIVATE)
    fillet1_2_piece_24a = split(fillet1_2_piece_24a, bisect_by=Plane(origin=(52.5, 10, 0), z_dir=(1, 0, 0)), keep=Keep.TOP, mode=Mode.PRIVATE)
    fillet1_2_piece_24a = split(fillet1_2_piece_24a, bisect_by=Plane(origin=(57.5, 10, 0), z_dir=(-1, 0, 0)), keep=Keep.TOP, mode=Mode.PRIVATE)
    with BuildSketch(Plane(origin=(57.5, 2.5, 0), x_dir=(-1, 0, 0), z_dir=(0, 1, 0))) as fillet1_2_piece_24b_section:
        with BuildLine():
            CenterArc((FILLET1_R, -FILLET1_R), FILLET1_R, 90, 90)
            Line((0, -FILLET1_R), (0, 0))
            Line((0, 0), (FILLET1_R, 0))
        make_face()
    fillet1_2_piece_24b = extrude(amount=42.5, mode=Mode.PRIVATE)
    fillet1_2_piece_24b = split(fillet1_2_piece_24b, bisect_by=Plane(origin=(57.5, 10, 0), z_dir=(0, -1, 0)), keep=Keep.TOP, mode=Mode.PRIVATE)
    fillet1_2_piece_24 = fillet1_2_piece_24a & fillet1_2_piece_24b
    add(fillet1_2_piece_24, mode=Mode.SUBTRACT)
    # the kernel refuses this fillet: 3 mm, written as the material it takes off along each edge
    with BuildSketch(Plane(origin=(144.5, 42, -112), x_dir=(0, 0, -1), z_dir=(1, 0, 0))) as fillet1_3_piece_1_section:
        Polygon((0, 0), (FILLET1_R * 1.02, 0), (FILLET1_R * 1.02, FILLET1_R * 1.02), (0, FILLET1_R * 1.02), align=None)
    fillet1_3_piece_1 = extrude(amount=FILLET1_R * 1.02, mode=Mode.PRIVATE)
    fillet1_3_piece_1 = fillet1_3_piece_1 - Plane(origin=(144.5, 42, -112), x_dir=(0, -0.7071067811865475, 0.7071067811865475), z_dir=(1, 0, 0)) * Sphere(FILLET1_R, mode=Mode.PRIVATE)
    add(fillet1_3_piece_1, mode=Mode.SUBTRACT)
    with BuildSketch(Plane(origin=(144.5, 42, -28), x_dir=(0, 0, 1), z_dir=(1, 0, 0))) as fillet1_3_piece_2_section:
        Polygon((0, 0), (FILLET1_R * 1.02, 0), (FILLET1_R * 1.02, -FILLET1_R * 1.02), (0, -FILLET1_R * 1.02), align=None)
    fillet1_3_piece_2 = extrude(amount=FILLET1_R * 1.02, mode=Mode.PRIVATE)
    fillet1_3_piece_2 = fillet1_3_piece_2 - Plane(origin=(144.5, 42, -28), x_dir=(0, -0.7071067811865475, -0.7071067811865475), z_dir=(1, 0, 0)) * Sphere(FILLET1_R, mode=Mode.PRIVATE)
    add(fillet1_3_piece_2, mode=Mode.SUBTRACT)
    with BuildSketch(Plane(origin=(144.5, 7, -3), x_dir=(0, 1, 0), z_dir=(1, 0, 0))) as fillet1_3_piece_3_section:
        Polygon((0, 0), (FILLET1_R * 1.02, 0), (FILLET1_R * 1.02, FILLET1_R * 1.02), (0, FILLET1_R * 1.02), align=None)
    fillet1_3_piece_3 = extrude(amount=FILLET1_R * 1.02, mode=Mode.PRIVATE)
    fillet1_3_piece_3 = fillet1_3_piece_3 - Plane(origin=(144.5, 7, -3), x_dir=(0, -0.7071067811865475, -0.7071067811865475), z_dir=(1, 0, 0)) * Sphere(FILLET1_R, mode=Mode.PRIVATE)
    add(fillet1_3_piece_3, mode=Mode.SUBTRACT)
    with BuildSketch(Plane(origin=(144.5, 7, -137), x_dir=(0, 1, 0), z_dir=(1, 0, 0))) as fillet1_3_piece_4_section:
        Polygon((0, 0), (FILLET1_R * 1.02, 0), (FILLET1_R * 1.02, -FILLET1_R * 1.02), (0, -FILLET1_R * 1.02), align=None)
    fillet1_3_piece_4 = extrude(amount=FILLET1_R * 1.02, mode=Mode.PRIVATE)
    fillet1_3_piece_4 = fillet1_3_piece_4 - Plane(origin=(144.5, 7, -137), x_dir=(0, -0.7071067811865475, 0.7071067811865475), z_dir=(1, 0, 0)) * Sphere(FILLET1_R, mode=Mode.PRIVATE)
    add(fillet1_3_piece_4, mode=Mode.SUBTRACT)
    with BuildSketch(Plane(origin=(147.5, 10, -118), x_dir=(0, -1, 0), z_dir=(0, 0, -1)), Plane(origin=(147.5, 10, -3), x_dir=(0, -1, 0), z_dir=(0, 0, -1))) as fillet1_3_piece_5:
        with BuildLine():
            CenterArc((FILLET1_R, FILLET1_R), FILLET1_R, 180, 90)
            Line((0, FILLET1_R), (0, 0))
            Line((0, 0), (FILLET1_R, 0))
        make_face()
    extrude(amount=19, mode=Mode.SUBTRACT)
    with BuildSketch(Plane(origin=(147.5, 13, -25), x_dir=(0, 0, -1), z_dir=(0, 1, 0))) as fillet1_3_piece_6:
        with BuildLine():
            CenterArc((FILLET1_R, FILLET1_R), FILLET1_R, 180, 90)
            Line((0, FILLET1_R), (0, 0))
            Line((0, 0), (FILLET1_R, 0))
        make_face()
    extrude(amount=29, mode=Mode.SUBTRACT)
    with BuildSketch(Plane(origin=(147.5, 13, -115), x_dir=(0, 0, 1), z_dir=(0, 1, 0))) as fillet1_3_piece_7:
        with BuildLine():
            CenterArc((FILLET1_R, -FILLET1_R), FILLET1_R, 90, 90)
            Line((0, -FILLET1_R), (0, 0))
            Line((0, 0), (FILLET1_R, 0))
        make_face()
    extrude(amount=29, mode=Mode.SUBTRACT)
    with BuildSketch(Plane(origin=(147.5, 13, -118), x_dir=(0, -1, 0), z_dir=(0, 0, -1))) as fillet1_3_piece_8:
        with BuildLine():
            CenterArc((3 + FILLET1_R, FILLET1_R), FILLET1_R, 180, 90)
            Line((3, FILLET1_R), (3, 0))
            Line((3, 0), (3 + FILLET1_R, 0))
        make_face()
    revolve(axis=Axis((147.5, 13, -118), (-1, 0, 0)), revolution_arc=90, mode=Mode.SUBTRACT)
    with BuildSketch(Plane(origin=(147.5, 13, -22), x_dir=(0, 0, -1), z_dir=(0, 1, 0))) as fillet1_3_piece_9:
        with BuildLine():
            CenterArc((3 + FILLET1_R, FILLET1_R), FILLET1_R, 180, 90)
            Line((3, FILLET1_R), (3, 0))
            Line((3, 0), (3 + FILLET1_R, 0))
        make_face()
    revolve(axis=Axis((147.5, 13, -22), (-1, 0, 0)), revolution_arc=90, mode=Mode.SUBTRACT)


solid = part.part
